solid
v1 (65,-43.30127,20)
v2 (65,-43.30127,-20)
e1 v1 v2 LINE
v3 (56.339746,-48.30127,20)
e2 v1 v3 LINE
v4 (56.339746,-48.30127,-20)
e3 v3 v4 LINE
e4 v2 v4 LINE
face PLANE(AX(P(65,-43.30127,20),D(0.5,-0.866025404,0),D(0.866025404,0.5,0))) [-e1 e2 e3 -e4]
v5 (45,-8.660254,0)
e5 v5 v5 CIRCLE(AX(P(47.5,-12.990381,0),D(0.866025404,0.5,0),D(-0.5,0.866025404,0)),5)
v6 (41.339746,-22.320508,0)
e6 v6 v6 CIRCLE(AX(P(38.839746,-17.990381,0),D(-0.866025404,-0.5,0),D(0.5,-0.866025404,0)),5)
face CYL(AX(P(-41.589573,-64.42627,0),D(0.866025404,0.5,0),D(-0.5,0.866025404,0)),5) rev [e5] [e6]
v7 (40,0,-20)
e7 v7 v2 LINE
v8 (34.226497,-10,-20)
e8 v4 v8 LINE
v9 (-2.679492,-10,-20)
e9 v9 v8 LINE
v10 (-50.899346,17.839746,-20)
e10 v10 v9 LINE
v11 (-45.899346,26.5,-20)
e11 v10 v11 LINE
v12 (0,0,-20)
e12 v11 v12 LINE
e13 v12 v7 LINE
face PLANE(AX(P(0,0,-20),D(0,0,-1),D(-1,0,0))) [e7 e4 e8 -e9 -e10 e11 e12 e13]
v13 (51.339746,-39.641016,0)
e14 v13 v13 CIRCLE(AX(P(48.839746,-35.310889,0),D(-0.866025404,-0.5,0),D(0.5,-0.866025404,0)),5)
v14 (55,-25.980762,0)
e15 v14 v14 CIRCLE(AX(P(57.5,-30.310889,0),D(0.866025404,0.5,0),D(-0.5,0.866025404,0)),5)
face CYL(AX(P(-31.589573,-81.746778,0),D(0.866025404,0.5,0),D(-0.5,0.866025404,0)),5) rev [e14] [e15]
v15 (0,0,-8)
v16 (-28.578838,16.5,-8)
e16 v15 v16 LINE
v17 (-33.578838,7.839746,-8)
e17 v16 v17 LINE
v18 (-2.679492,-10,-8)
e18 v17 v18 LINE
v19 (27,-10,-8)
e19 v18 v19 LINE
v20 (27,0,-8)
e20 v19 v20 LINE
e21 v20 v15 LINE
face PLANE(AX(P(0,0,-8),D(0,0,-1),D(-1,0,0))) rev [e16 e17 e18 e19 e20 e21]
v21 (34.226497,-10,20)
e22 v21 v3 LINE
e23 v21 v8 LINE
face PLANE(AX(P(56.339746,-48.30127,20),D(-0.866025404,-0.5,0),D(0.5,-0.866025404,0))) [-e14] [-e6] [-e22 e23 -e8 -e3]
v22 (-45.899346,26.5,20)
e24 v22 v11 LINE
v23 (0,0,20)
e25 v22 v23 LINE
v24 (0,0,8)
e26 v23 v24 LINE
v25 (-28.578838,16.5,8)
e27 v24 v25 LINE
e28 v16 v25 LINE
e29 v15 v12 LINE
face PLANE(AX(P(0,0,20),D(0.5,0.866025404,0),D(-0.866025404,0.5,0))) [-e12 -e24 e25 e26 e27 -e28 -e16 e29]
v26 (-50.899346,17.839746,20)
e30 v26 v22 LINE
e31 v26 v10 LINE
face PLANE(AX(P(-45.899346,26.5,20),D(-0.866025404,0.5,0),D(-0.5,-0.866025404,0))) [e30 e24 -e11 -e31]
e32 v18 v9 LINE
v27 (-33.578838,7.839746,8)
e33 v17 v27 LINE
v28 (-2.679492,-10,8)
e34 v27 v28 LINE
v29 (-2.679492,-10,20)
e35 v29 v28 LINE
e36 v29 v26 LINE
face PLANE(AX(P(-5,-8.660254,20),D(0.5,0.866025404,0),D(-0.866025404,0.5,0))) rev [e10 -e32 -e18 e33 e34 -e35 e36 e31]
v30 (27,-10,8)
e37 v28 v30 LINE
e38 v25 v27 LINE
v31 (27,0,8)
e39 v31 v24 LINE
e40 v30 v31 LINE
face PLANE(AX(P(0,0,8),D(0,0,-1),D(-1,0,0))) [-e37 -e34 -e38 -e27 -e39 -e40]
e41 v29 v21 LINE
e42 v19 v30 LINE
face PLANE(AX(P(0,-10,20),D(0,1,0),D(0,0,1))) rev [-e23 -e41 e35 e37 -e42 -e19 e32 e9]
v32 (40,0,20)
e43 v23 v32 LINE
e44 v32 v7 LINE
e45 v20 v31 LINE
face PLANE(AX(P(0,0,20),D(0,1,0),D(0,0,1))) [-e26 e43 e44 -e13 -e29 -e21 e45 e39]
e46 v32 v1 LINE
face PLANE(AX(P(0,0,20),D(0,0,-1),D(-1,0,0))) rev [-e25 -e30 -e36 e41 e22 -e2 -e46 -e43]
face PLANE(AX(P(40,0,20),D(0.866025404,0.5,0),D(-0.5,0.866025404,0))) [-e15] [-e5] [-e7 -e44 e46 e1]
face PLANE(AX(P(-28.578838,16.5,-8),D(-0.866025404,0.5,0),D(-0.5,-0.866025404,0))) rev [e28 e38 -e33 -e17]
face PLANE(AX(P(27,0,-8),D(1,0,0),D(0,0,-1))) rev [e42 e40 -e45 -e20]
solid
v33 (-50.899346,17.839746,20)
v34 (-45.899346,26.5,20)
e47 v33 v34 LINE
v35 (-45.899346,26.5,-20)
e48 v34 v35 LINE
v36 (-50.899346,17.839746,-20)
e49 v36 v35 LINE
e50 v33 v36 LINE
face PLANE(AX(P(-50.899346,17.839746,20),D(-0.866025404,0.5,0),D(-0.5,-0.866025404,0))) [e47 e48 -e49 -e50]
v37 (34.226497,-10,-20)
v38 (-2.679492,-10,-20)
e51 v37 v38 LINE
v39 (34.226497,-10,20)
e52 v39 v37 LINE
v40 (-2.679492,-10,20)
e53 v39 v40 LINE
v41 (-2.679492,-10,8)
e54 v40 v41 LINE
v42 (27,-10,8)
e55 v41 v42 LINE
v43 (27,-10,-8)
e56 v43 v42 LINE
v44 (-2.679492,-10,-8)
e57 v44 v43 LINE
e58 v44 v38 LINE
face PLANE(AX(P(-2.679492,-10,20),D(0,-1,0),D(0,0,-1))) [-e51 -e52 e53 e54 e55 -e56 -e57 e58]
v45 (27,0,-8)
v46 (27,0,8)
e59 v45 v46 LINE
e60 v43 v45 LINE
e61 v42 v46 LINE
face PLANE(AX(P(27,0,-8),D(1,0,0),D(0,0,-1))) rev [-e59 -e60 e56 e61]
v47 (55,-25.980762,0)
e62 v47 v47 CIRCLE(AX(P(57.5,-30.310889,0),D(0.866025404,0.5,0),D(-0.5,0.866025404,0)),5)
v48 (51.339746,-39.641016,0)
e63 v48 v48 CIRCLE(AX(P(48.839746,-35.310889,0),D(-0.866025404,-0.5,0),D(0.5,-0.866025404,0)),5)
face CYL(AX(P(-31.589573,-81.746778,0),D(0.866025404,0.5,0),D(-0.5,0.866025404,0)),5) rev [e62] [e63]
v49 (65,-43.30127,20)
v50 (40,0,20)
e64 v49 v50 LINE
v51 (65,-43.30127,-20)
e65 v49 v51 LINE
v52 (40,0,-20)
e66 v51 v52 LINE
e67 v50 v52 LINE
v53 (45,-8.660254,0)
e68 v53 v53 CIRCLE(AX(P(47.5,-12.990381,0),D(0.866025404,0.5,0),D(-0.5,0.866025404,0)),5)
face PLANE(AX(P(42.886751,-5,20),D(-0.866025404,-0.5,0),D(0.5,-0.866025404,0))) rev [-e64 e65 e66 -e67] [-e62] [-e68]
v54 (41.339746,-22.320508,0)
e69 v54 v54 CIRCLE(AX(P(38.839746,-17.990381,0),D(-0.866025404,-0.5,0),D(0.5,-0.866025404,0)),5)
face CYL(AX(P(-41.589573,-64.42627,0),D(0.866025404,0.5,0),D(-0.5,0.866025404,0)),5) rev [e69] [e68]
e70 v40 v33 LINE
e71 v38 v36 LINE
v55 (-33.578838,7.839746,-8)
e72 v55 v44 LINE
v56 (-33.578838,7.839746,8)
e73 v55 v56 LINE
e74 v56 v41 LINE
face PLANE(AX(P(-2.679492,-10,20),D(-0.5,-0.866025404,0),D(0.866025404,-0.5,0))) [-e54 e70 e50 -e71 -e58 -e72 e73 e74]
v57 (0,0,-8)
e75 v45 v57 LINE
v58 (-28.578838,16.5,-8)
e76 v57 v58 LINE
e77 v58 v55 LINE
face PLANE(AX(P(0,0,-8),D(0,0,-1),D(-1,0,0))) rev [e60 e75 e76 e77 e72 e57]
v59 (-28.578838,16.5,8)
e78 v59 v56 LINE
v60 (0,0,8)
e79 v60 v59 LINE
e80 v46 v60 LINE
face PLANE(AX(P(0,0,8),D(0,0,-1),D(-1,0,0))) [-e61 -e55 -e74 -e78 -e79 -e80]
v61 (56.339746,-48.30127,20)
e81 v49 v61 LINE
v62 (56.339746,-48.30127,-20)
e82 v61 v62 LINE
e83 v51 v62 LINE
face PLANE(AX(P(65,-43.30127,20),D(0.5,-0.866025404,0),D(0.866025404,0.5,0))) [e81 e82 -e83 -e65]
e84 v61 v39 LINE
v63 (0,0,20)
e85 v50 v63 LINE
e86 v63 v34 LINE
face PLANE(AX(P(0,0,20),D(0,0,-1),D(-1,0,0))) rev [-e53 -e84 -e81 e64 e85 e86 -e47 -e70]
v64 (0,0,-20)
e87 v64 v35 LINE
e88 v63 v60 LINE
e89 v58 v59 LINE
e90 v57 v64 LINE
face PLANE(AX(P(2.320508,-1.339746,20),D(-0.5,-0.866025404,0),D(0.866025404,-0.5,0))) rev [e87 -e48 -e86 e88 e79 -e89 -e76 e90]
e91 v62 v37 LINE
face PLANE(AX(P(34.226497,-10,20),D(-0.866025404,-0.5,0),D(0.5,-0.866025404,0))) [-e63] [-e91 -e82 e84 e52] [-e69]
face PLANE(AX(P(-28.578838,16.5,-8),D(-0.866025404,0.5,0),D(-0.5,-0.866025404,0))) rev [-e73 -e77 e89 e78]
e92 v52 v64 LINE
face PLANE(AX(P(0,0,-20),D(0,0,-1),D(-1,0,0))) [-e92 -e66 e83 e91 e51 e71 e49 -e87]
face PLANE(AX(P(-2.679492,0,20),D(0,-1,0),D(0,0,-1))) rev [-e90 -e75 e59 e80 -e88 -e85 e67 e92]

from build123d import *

# Parameters (mm, degrees)
EXTRUDE_THIN1_START   = -20
EXTRUDE_THIN1_DEPTH   = 40
EXTRUDE_THIN1_2_DEPTH = 40
CUT_EXTRUDE1_DEPTH    = 8
SKETCH4_R             = 5
CUT_EXTRUDE2_DEPTH    = 107.070363583


# Read off the part's stored shape, not the designer's step: Extrude-Thin1
with BuildPart() as part:
    # Extrude-Thin1 outline → Extrude-Thin1 (new body)
    with BuildSketch(Plane.XY.offset(EXTRUDE_THIN1_START)):
        Polygon((0, 0), (-45.899346401, 26.5), (-50.899346401, 17.839745962), (-2.679491924, -10), (34.226497308, -10), (56.339745962, -48.301270189), (65, -43.301270189), (40, 0), align=None)
    extrude(amount=EXTRUDE_THIN1_DEPTH)


with BuildPart() as body_2:
    # Extrude-Thin1 2 outline → Extrude-Thin1 2 (new body)
    with BuildSketch(Plane.XY.offset(EXTRUDE_THIN1_START)):
        Polygon((-2.679491924, -10), (34.226497308, -10), (56.339745962, -48.301270189), (65, -43.301270189), (40, 0), (0, 0), (-45.899346401, 26.5), (-50.899346401, 17.839745962), align=None)
    extrude(amount=EXTRUDE_THIN1_2_DEPTH)


with BuildPart() as cut_extrude1_tool:
    # Sketch3 → Cut-Extrude1 (new, symmetric)
    with BuildSketch(Plane.XY):
        Polygon((-28.578838325, 16.5), (-33.578838325, 7.839745962), (-2.679491924, -10), (27, -10), (27, 0), (0, 0), align=None)
    extrude(amount=CUT_EXTRUDE1_DEPTH, both=True)


with BuildPart() as part_1:
    add(part.part)

    # Cut-Extrude1: cut by cut_extrude1_tool
    add(cut_extrude1_tool.part, mode=Mode.SUBTRACT)


with BuildPart() as body_2_1:
    add(body_2.part)

    # Cut-Extrude1: cut by cut_extrude1_tool
    add(cut_extrude1_tool.part, mode=Mode.SUBTRACT)


with BuildPart() as cut_extrude2_tool:
    # Sketch4 → Cut-Extrude2 (new, through all)
    with BuildSketch(Plane(origin=(30, 17.320508076, 0), x_dir=(0, 0, -1), z_dir=(0.8660254037844378, 0.5000000000000016, 0))):
        with Locations(Location((0, -35, 0), (0, 0, 90))):
            Circle(SKETCH4_R)
        with Locations(Location((0, -55, 0), (0, 0, 90))):
            Circle(SKETCH4_R)
    extrude(amount=-CUT_EXTRUDE2_DEPTH)


with BuildPart() as part_2:
    add(part_1.part)

    # Cut-Extrude2: cut by cut_extrude2_tool
    add(cut_extrude2_tool.part, mode=Mode.SUBTRACT)


with BuildPart() as body_2_2:
    add(body_2_1.part)

    # Cut-Extrude2: cut by cut_extrude2_tool
    add(cut_extrude2_tool.part, mode=Mode.SUBTRACT)


solid = Compound([part_2.part, body_2_2.part])
